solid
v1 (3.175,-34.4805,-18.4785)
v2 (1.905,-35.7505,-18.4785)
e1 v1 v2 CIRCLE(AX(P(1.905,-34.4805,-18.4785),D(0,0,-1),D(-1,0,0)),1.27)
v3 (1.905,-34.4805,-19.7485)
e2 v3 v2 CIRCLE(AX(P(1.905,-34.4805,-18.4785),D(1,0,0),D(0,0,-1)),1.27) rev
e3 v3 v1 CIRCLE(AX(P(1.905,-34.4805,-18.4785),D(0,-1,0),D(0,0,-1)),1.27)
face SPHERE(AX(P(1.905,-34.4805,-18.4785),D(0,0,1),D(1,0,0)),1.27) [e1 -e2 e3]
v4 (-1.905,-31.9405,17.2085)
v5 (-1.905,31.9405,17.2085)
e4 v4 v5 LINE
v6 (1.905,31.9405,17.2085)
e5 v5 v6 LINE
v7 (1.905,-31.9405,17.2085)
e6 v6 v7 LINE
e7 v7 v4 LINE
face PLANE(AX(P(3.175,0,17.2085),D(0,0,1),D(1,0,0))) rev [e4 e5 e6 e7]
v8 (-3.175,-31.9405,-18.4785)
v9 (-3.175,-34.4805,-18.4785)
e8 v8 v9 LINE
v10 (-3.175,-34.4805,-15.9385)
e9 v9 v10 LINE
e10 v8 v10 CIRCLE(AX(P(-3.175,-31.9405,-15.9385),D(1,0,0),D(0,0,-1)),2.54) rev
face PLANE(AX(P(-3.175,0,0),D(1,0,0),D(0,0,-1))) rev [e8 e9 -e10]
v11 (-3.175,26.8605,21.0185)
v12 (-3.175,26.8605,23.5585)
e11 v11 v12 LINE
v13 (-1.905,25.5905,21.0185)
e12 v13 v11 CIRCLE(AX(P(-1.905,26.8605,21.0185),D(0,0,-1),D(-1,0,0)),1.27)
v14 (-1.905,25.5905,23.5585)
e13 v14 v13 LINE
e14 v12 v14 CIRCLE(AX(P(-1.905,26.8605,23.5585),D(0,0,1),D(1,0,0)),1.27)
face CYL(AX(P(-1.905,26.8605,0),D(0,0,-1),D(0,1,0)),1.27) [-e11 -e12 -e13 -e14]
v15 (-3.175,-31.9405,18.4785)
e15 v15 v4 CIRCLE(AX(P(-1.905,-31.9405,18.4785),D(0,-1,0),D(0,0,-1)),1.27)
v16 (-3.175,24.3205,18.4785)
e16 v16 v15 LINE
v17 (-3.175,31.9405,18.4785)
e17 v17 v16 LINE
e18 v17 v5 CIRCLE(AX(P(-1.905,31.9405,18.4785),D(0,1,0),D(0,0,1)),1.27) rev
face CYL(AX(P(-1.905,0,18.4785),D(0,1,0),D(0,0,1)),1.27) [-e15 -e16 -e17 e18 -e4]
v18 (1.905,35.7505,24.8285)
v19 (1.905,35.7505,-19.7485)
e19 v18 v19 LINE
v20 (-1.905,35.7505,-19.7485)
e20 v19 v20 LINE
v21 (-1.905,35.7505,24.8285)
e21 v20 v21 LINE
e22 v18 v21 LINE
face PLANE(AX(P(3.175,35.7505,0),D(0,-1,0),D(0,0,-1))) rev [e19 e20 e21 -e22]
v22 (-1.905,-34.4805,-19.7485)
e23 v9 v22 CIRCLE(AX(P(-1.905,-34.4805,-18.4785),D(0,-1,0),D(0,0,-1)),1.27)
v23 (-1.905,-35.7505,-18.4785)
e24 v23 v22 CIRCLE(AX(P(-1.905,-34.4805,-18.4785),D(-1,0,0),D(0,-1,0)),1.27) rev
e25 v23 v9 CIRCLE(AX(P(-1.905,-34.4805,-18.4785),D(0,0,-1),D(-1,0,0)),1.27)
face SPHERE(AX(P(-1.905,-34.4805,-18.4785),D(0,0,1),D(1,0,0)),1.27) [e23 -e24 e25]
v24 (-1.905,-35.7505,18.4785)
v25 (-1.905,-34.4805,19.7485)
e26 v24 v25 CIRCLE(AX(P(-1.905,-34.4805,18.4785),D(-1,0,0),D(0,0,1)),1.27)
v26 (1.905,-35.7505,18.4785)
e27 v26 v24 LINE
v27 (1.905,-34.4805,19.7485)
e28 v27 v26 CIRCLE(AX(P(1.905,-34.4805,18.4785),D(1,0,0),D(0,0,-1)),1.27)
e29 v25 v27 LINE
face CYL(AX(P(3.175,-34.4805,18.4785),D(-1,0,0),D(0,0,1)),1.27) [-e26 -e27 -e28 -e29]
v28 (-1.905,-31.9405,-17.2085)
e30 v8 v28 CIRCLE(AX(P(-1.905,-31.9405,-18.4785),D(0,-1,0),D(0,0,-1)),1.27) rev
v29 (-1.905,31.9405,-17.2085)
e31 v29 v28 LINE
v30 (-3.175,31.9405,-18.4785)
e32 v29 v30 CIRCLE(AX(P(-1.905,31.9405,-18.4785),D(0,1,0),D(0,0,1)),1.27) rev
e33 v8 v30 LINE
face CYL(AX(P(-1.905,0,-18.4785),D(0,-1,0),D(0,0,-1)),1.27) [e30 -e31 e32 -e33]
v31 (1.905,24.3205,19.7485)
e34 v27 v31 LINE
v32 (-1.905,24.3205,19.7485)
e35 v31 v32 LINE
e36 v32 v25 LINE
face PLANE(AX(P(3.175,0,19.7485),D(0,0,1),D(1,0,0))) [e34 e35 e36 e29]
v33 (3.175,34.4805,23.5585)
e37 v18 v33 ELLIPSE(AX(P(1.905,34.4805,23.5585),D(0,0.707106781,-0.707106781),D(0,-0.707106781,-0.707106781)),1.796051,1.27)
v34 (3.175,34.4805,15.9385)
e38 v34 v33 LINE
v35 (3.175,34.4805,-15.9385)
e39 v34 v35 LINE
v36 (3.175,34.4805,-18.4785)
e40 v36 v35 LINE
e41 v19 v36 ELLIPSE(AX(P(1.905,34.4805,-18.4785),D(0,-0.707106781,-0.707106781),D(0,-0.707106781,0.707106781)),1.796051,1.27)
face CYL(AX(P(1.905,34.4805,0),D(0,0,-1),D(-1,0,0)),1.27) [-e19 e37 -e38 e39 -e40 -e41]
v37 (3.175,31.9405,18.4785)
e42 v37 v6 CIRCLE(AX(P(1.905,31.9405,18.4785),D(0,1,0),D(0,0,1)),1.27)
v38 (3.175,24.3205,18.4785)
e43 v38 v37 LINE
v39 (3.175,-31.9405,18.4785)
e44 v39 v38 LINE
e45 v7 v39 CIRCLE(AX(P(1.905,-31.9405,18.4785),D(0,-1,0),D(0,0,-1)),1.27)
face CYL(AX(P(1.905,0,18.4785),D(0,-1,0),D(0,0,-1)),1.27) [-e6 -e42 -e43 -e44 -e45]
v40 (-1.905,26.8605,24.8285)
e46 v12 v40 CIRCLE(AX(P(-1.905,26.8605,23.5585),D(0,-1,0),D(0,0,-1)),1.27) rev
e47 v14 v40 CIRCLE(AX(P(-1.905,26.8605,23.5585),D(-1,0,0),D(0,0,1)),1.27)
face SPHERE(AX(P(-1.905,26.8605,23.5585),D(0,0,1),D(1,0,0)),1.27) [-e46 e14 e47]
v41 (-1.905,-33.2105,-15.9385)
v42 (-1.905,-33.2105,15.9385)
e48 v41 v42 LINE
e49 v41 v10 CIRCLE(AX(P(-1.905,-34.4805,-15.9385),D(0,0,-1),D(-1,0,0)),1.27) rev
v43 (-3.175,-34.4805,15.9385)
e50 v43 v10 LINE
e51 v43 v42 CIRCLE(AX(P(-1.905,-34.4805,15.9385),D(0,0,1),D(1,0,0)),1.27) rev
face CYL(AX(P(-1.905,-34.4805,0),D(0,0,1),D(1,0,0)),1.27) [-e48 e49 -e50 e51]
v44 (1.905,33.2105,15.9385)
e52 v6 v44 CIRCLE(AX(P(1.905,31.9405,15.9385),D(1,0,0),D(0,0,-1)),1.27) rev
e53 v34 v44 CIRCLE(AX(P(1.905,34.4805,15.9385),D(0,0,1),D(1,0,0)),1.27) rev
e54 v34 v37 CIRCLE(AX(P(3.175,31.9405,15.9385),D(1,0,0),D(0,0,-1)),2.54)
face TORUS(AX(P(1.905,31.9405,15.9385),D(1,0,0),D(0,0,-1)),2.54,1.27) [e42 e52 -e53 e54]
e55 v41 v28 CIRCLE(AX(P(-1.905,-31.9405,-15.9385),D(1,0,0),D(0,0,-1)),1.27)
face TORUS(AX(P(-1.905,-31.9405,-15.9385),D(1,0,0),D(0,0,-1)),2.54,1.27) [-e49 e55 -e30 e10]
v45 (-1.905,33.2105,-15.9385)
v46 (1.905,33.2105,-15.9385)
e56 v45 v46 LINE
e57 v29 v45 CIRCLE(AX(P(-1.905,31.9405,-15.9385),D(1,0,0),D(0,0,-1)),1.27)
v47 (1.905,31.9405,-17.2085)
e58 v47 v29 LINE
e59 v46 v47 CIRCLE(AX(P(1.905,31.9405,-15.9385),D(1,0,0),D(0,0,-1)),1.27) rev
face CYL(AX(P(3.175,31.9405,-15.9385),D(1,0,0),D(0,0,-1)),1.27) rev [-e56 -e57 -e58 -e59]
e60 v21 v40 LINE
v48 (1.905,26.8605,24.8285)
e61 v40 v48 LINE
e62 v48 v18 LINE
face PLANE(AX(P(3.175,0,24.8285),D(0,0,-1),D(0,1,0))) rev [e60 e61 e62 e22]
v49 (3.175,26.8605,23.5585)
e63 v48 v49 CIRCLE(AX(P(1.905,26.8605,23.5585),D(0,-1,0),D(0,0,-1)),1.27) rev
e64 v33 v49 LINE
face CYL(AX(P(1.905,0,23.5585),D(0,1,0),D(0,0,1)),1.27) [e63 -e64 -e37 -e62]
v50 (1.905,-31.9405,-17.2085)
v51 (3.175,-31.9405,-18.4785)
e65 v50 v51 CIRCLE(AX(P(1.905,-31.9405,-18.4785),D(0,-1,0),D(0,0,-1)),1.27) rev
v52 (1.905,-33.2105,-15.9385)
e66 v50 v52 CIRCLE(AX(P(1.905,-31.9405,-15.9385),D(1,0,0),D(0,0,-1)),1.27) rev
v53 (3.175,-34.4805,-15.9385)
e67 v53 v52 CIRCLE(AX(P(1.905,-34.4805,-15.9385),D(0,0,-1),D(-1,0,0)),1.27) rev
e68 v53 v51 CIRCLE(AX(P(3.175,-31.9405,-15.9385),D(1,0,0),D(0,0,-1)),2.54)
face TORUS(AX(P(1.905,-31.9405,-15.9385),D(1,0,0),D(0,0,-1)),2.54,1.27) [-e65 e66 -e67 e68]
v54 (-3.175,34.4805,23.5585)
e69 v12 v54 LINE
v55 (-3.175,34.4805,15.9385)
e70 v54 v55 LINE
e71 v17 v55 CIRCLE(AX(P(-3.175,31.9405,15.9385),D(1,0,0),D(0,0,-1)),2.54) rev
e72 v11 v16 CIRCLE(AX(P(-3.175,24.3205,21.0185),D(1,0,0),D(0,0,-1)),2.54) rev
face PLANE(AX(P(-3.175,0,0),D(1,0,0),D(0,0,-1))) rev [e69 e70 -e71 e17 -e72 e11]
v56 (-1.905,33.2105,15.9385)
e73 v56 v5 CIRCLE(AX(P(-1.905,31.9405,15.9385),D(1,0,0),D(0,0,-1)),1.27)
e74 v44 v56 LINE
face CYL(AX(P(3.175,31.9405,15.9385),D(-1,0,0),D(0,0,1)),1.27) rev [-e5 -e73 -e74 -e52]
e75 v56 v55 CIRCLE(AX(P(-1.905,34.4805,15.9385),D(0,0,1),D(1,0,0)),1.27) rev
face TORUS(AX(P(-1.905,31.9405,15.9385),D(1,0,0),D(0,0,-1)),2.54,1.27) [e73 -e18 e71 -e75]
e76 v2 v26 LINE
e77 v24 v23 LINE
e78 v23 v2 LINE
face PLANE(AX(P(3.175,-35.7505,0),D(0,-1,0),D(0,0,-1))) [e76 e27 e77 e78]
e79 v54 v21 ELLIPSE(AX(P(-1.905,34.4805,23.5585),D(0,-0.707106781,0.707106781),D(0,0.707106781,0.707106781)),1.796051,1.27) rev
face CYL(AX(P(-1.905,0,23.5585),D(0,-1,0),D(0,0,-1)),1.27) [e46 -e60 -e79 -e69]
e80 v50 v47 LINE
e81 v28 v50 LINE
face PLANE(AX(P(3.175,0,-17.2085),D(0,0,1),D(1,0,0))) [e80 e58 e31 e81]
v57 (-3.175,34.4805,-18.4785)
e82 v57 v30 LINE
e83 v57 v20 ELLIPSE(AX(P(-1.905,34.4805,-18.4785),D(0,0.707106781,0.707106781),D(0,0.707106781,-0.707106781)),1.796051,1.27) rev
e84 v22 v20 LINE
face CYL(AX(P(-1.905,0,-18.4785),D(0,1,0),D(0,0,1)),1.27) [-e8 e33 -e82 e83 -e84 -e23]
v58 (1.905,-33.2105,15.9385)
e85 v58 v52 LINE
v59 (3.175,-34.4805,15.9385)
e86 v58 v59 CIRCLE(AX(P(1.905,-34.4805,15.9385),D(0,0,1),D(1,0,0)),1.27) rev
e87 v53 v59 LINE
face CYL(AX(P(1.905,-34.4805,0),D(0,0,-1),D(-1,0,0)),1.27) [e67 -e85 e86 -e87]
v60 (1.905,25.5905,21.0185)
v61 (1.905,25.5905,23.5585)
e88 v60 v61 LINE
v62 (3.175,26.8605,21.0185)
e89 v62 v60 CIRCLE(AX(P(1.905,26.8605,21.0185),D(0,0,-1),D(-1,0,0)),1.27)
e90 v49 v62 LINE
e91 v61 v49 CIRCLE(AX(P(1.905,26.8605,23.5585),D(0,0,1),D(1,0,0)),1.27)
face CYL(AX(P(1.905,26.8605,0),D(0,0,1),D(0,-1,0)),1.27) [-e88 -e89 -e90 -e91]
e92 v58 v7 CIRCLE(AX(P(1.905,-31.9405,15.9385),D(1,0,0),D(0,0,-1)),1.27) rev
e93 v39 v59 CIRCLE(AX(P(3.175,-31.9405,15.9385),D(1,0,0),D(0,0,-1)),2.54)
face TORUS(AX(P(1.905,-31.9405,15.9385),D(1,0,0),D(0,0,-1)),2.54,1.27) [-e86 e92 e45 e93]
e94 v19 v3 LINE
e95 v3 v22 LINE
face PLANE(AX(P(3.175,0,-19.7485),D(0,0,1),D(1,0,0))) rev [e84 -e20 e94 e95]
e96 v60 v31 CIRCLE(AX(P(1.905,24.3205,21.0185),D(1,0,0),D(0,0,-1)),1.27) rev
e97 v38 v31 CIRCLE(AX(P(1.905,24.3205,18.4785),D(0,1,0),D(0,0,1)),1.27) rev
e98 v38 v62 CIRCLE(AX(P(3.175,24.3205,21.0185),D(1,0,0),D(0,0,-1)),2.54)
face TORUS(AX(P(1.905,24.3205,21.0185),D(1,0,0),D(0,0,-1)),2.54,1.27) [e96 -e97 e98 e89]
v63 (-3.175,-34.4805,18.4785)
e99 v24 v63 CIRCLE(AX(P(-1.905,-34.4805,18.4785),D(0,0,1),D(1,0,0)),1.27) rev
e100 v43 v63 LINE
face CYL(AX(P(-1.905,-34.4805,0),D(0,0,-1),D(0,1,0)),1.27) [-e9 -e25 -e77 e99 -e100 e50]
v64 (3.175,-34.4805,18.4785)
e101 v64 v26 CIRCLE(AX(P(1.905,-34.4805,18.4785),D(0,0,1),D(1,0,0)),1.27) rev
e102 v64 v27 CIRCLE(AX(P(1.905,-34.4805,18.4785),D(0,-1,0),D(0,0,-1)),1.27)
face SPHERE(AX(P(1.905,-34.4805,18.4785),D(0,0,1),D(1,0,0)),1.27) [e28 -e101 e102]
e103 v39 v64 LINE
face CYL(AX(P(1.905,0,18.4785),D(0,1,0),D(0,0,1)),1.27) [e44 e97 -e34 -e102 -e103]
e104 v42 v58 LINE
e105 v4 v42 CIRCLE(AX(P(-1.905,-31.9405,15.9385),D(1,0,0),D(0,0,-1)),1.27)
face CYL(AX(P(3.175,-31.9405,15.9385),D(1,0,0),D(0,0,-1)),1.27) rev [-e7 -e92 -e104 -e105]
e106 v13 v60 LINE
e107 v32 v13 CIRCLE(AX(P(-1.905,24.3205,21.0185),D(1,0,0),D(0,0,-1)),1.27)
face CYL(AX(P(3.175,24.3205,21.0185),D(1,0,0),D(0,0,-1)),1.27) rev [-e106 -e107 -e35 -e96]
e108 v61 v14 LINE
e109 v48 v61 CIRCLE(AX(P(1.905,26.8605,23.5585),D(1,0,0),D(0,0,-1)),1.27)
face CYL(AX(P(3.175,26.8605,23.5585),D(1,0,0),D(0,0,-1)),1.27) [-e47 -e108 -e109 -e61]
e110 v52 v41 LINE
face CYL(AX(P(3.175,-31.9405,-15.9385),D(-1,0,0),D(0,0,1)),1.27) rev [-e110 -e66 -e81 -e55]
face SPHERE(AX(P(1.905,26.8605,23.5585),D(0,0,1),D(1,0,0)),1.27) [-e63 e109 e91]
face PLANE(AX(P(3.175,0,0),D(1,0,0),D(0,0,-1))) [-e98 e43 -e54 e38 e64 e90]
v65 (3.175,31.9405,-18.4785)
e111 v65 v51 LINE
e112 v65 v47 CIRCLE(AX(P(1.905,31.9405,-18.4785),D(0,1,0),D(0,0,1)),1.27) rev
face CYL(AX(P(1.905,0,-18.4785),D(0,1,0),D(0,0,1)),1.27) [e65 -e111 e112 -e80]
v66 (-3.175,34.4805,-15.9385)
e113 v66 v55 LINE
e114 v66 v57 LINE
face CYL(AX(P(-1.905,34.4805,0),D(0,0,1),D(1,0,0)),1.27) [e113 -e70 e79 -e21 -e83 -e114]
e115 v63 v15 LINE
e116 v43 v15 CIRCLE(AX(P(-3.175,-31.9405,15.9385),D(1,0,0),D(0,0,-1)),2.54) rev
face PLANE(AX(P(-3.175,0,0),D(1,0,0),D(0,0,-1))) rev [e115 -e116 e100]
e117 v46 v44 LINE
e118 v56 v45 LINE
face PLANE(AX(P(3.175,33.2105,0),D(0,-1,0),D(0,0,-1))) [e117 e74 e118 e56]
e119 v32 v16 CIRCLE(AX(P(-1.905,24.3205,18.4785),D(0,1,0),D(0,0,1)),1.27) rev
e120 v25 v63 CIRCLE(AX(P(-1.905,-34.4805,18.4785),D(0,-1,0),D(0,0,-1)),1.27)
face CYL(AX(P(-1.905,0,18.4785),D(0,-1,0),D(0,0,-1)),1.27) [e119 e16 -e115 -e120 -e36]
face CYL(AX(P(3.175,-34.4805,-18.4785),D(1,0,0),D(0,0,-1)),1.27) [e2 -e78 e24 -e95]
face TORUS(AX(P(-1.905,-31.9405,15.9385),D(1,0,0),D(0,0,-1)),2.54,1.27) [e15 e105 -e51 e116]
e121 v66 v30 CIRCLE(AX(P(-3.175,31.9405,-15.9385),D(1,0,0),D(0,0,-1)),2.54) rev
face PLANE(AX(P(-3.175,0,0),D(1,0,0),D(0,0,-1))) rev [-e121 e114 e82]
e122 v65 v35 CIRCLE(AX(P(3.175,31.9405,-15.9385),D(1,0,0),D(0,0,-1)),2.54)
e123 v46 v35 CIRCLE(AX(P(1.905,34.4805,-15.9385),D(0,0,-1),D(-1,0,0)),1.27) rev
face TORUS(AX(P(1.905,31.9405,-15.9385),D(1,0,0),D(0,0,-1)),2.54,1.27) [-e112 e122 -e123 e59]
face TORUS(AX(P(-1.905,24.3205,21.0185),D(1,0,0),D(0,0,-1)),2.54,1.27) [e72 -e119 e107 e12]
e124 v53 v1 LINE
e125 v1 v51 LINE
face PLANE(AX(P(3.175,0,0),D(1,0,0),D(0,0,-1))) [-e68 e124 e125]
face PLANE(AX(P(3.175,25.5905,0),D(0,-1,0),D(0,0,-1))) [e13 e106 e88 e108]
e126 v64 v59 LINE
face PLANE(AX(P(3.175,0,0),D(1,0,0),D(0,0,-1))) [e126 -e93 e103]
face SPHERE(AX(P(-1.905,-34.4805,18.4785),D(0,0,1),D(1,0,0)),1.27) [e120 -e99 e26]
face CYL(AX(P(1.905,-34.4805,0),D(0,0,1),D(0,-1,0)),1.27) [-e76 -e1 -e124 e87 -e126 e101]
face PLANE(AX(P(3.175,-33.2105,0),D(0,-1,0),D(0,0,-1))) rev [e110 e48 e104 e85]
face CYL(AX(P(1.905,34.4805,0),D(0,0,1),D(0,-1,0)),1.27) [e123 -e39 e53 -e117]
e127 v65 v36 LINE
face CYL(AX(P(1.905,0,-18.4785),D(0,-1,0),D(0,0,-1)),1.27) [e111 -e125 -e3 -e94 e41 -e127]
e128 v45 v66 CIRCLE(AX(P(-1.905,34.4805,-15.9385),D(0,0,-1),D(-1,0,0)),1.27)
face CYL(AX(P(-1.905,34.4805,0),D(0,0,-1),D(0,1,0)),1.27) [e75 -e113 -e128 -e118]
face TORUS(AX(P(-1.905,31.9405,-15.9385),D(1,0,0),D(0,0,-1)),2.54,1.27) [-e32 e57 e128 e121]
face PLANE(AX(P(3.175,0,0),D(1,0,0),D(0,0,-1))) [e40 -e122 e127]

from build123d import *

# Parameters (mm, degrees)
SKETCH1_W           = 39.497
SKETCH1_H           = 71.501
SKETCH1_W_2         = 34.417
SKETCH1_H_2         = 66.421
SKETCH1_W_3         = 5.08
SKETCH1_H_3         = 10.16
BOSS_EXTRUDE1_DEPTH = 3.175
FILLET1_R           = 1.27


with BuildPart() as part:
    # Sketch1 → Boss-Extrude1 (new, symmetric)
    # profile 1 of 2: a face of its own
    with BuildSketch(Plane(origin=(0, 0, 0), x_dir=(0, 0, -1), z_dir=(1, 0, 0))):
        Rectangle(SKETCH1_W, SKETCH1_H)
        Rectangle(SKETCH1_W_2, SKETCH1_H_2, mode=Mode.SUBTRACT)
    # profile 2 of 2: a face of its own
    with BuildSketch(Plane(origin=(0, 0, 0), x_dir=(0, 0, -1), z_dir=(1, 0, 0))):
        with Locations((-22.2885, 30.6705)):
            Rectangle(SKETCH1_W_3, SKETCH1_H_3)
    extrude(amount=BOSS_EXTRUDE1_DEPTH, both=True)

    # Fillet1
    fillet1_edges = [part.edges().sort_by_distance(p)[0] for p in [
        (-3.175, -5.08, 19.7485),
        (-3.175, 25.5905, 22.2885),
        (-3.175, 30.6705, 24.8285),
        (-3.175, 35.7505, 2.54),
        (3.175, 33.2105, 0),
        (-3.175, 0, -19.7485),
        (-3.175, -35.7505, 0),
        (-3.175, 0, -17.2085),
        (-3.175, 33.2105, 0),
        (-3.175, 0, 17.2085),
        (-3.175, -33.2105, 0),
        (3.175, 0, -17.2085),
        (0, -35.7505, 19.7485),
        (0, 25.5905, 19.7485),
        (0, 25.5905, 24.8285),
        (0, -35.7505, -19.7485),
        (0, -33.2105, -17.2085),
        (0, 33.2105, -17.2085),
        (0, 33.2105, 17.2085),
        (0, -33.2105, 17.2085),
        (3.175, -35.7505, 0),
        (3.175, 0, -19.7485),
        (3.175, 35.7505, 2.54),
        (3.175, 30.6705, 24.8285),
        (3.175, 25.5905, 22.2885),
        (3.175, -5.08, 19.7485),
        (3.175, -33.2105, 0),
        (3.175, 0, 17.2085),
    ]]
    fillet(fillet1_edges, radius=FILLET1_R - 0.0001)  # a hair under: the kernel refuses the full size


solid = part.part
